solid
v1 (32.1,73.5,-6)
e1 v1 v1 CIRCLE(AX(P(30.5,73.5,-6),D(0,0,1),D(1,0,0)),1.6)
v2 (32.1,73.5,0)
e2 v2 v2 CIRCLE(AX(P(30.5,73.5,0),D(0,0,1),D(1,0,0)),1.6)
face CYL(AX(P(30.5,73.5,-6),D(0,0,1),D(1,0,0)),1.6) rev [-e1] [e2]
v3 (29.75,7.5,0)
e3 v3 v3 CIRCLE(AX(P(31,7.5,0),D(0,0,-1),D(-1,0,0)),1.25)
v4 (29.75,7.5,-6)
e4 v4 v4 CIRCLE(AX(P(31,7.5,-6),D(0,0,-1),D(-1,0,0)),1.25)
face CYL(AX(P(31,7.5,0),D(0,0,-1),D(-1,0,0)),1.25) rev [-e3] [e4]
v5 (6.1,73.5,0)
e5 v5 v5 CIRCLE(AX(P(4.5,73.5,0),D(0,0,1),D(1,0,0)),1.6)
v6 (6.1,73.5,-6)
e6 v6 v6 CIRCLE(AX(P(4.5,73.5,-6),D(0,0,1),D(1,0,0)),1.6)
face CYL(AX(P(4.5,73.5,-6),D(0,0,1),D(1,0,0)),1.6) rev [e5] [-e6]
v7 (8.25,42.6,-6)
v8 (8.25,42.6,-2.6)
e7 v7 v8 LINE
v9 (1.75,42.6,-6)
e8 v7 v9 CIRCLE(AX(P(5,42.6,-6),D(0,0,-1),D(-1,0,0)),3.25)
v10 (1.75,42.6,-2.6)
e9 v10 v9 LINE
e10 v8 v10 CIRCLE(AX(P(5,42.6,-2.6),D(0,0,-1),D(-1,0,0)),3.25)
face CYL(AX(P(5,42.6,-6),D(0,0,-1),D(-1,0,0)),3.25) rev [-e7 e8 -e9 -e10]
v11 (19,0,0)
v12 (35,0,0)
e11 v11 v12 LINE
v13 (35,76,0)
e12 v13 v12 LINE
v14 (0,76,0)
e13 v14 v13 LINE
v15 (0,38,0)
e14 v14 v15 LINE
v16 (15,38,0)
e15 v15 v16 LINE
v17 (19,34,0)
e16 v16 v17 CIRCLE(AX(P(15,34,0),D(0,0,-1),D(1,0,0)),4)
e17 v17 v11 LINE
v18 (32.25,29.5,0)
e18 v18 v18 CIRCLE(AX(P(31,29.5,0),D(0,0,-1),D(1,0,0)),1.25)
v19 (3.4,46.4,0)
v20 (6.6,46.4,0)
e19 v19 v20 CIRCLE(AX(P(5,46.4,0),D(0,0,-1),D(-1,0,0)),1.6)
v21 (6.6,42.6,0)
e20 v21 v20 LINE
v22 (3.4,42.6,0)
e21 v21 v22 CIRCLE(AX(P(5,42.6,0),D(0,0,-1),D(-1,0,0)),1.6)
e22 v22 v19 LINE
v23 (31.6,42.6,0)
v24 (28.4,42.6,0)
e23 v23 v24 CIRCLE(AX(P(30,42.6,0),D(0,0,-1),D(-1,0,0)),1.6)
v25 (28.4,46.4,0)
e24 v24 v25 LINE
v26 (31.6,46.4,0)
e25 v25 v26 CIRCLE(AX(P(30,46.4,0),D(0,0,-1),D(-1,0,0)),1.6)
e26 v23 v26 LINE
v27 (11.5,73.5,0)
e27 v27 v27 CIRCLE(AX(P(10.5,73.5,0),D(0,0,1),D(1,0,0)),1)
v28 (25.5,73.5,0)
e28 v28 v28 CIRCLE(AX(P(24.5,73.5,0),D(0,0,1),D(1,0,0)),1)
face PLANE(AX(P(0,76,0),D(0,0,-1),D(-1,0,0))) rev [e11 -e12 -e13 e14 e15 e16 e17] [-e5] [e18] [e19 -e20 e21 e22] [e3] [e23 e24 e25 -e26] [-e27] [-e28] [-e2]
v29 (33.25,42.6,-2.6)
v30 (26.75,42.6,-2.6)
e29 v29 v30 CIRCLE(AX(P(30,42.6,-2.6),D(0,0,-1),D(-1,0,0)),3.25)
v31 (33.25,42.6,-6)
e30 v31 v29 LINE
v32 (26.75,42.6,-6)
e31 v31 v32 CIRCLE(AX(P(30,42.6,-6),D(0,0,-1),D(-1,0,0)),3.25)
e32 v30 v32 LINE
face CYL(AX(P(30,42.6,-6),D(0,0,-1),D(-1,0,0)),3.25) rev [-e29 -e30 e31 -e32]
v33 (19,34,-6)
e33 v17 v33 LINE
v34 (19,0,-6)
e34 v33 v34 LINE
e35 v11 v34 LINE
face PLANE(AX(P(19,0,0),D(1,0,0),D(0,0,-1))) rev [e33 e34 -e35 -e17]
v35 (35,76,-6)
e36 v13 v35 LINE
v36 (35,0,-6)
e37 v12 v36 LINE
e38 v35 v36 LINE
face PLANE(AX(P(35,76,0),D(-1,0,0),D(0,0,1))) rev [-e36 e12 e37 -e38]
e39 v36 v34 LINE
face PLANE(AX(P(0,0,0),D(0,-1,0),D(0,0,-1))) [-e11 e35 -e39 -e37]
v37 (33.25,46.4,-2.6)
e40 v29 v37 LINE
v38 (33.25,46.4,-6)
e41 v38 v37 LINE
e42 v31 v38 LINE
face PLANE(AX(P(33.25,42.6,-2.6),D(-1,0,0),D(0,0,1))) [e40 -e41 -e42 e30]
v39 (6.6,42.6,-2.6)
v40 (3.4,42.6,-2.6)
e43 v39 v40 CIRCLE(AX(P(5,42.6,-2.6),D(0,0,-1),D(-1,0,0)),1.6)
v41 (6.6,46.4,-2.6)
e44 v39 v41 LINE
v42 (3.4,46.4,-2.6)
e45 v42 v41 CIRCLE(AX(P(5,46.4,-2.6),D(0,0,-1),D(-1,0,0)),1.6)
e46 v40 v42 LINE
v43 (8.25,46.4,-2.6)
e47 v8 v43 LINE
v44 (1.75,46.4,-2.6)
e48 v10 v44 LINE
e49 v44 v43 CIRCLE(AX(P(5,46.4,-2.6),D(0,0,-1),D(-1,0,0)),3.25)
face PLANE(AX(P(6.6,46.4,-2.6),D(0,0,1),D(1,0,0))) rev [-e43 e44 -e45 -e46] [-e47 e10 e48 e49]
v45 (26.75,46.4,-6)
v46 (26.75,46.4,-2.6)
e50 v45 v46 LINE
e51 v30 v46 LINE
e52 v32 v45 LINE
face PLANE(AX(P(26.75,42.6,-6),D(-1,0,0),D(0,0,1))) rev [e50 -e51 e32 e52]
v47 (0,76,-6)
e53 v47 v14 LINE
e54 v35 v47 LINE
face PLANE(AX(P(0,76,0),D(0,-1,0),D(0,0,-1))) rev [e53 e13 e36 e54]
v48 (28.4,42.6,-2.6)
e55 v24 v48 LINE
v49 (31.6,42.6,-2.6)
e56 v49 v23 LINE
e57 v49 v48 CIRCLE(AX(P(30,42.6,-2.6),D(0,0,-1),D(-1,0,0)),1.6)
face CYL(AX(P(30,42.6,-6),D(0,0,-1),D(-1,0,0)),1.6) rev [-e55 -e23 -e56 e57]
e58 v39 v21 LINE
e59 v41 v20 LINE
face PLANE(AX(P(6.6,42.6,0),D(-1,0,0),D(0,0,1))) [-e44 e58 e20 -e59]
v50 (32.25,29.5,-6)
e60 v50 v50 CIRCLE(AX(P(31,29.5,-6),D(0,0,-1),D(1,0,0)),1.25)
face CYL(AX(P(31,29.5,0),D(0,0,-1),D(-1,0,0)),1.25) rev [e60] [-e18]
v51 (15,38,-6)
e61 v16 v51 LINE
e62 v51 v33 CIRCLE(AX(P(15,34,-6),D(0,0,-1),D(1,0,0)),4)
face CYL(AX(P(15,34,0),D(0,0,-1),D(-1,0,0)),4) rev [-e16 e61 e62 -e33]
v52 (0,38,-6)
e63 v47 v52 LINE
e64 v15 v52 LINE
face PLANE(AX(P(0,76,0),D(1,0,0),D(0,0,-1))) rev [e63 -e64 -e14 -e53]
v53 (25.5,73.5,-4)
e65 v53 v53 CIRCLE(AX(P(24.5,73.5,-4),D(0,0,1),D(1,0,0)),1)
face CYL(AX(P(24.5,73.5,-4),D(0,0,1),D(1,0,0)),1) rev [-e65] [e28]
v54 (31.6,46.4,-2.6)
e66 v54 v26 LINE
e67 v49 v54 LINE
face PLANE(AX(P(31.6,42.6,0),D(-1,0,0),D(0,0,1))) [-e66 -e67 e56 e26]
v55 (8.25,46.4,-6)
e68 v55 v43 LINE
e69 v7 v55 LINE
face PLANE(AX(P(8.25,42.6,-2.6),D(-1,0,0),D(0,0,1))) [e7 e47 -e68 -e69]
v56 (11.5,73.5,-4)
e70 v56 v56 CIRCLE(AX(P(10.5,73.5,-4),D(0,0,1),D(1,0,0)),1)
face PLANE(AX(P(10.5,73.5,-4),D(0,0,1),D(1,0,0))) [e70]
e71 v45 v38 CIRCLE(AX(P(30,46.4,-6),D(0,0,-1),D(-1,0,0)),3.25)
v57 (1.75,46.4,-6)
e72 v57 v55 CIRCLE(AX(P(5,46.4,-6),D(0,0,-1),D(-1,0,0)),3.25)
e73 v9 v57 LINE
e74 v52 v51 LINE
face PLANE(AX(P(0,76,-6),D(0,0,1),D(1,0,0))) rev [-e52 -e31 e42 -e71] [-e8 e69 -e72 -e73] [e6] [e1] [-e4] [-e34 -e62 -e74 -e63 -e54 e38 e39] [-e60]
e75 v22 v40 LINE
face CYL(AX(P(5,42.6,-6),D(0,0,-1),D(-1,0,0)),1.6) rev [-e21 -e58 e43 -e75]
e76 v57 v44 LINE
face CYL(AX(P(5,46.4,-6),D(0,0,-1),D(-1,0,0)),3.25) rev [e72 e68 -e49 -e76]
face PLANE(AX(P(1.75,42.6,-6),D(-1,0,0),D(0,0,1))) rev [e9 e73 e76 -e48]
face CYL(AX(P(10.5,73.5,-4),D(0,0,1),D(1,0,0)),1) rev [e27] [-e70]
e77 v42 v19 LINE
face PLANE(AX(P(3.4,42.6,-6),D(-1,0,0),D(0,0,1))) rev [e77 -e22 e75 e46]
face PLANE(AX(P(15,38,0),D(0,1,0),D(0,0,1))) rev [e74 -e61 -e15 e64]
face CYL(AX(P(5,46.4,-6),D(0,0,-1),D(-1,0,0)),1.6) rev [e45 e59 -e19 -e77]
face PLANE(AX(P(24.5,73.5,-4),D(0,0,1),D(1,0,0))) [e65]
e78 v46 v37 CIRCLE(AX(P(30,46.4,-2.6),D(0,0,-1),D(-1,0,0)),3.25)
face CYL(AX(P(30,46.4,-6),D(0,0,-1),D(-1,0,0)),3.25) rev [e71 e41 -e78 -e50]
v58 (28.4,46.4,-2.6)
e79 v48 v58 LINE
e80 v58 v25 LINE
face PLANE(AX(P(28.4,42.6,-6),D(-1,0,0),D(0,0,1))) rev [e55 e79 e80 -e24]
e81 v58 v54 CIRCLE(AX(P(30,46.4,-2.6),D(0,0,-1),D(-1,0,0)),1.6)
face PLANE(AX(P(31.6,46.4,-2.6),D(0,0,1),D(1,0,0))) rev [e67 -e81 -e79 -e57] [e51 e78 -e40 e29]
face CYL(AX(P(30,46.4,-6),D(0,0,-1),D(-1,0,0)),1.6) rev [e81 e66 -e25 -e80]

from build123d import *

# Parameters (mm, degrees)
SKETCH1_W                                      = 35
SKETCH1_H                                      = 6
BOSS_EXTRUDE1_DEPTH                            = 76
SKETCH2_R                                      = 1.6
CUT_EXTRUDE1_DEPTH                             = 84.886828525
SKETCH3_R                                      = 1
CUT_EXTRUDE2_DEPTH                             = 4
CBORE_START                                    = -6
CBORE_SLOT_FOR_M3_HEX_SOCKET_HEAD_CAP_SC_DEPTH = 3.4
CBORE_START_2                                  = -2.6
CBORE_SLOT_FOR_M3_HEX_SOCKET_HEAD_CA_3_DEPTH   = 2.6
CUT_EXTRUDE3_DEPTH                             = 84.886828525
SKETCH8_R                                      = 1.25
CUT_EXTRUDE4_DEPTH                             = 84.886828525


# Read off the part's stored shape, not the designer's step: CBORE SLOT for M3 Hex Socket Head Cap Screw1
with BuildPart() as part:
    # Sketch1 → Boss-Extrude1 (new body)
    with BuildSketch(Plane(origin=(0, 0, 0), x_dir=(1, 0, 0), z_dir=(0, 1, 0))):
        with Locations((17.5, 3)):
            Rectangle(SKETCH1_W, SKETCH1_H)
    extrude(amount=BOSS_EXTRUDE1_DEPTH)

    # Sketch2 → Cut-Extrude1 (cut, through all)
    with BuildSketch(Plane.XY):
        with Locations((4.5, 73.5)):
            Circle(SKETCH2_R)
        with Locations((30.5, 73.5)):
            Circle(SKETCH2_R)
    extrude(amount=-CUT_EXTRUDE1_DEPTH, mode=Mode.SUBTRACT)

    # Sketch3 → Cut-Extrude2 (cut)
    with BuildSketch(Plane.XY):
        with Locations((10.5, 73.5)):
            Circle(SKETCH3_R)
        with Locations((24.5, 73.5)):
            Circle(SKETCH3_R)
    extrude(amount=-CUT_EXTRUDE2_DEPTH, mode=Mode.SUBTRACT)

    # CBORE SLOT for M3 Hex Socket Head Ca 2 → CBORE SLOT for M3 Hex Socket Head Cap Screw1 (cut)
    with BuildSketch(Plane.XY.offset(CBORE_START)):
        with BuildLine():
            ThreePointArc((8.25, 46.4), (5, 49.65), (1.75, 46.4))
            Line((1.75, 46.4), (1.75, 42.6))
            ThreePointArc((1.75, 42.6), (5, 39.35), (8.25, 42.6))
            Line((8.25, 42.6), (8.25, 46.4))
        make_face()
        with BuildLine():
            ThreePointArc((33.25, 46.4), (30, 49.65), (26.75, 46.4))
            Line((26.75, 46.4), (26.75, 42.6))
            ThreePointArc((26.75, 42.6), (30, 39.35), (33.25, 42.6))
            Line((33.25, 42.6), (33.25, 46.4))
        make_face()
    extrude(amount=CBORE_SLOT_FOR_M3_HEX_SOCKET_HEAD_CAP_SC_DEPTH, mode=Mode.SUBTRACT)

    # CBORE SLOT for M3 Hex Socket Head Ca 3 o → CBORE SLOT for M3 Hex Socket Head Ca 3 (cut)
    with BuildSketch(Plane.XY.offset(CBORE_START_2)):
        with BuildLine():
            ThreePointArc((6.6, 46.4), (5, 48), (3.4, 46.4))
            Line((3.4, 46.4), (3.4, 42.6))
            ThreePointArc((3.4, 42.6), (5, 41), (6.6, 42.6))
            Line((6.6, 42.6), (6.6, 46.4))
        make_face()
        with BuildLine():
            ThreePointArc((31.6, 46.4), (30, 48), (28.4, 46.4))
            Line((28.4, 46.4), (28.4, 42.6))
            ThreePointArc((28.4, 42.6), (30, 41), (31.6, 42.6))
            Line((31.6, 42.6), (31.6, 46.4))
        make_face()
    extrude(amount=CBORE_SLOT_FOR_M3_HEX_SOCKET_HEAD_CA_3_DEPTH, mode=Mode.SUBTRACT)

    # Sketch7 → Cut-Extrude3 (cut, through all)
    with BuildSketch(Plane(origin=(0, 0, -6), x_dir=(-1, 0, 0), z_dir=(0, 0, -1))):
        with BuildLine():
            Line((0, 0), (-19, 0))
            Line((-19, 0), (-19, 34))
            ThreePointArc((-19, 34), (-17.828427125, 36.828427125), (-15, 38))
            Line((-15, 38), (0, 38))
            Line((0, 38), (0, 0))
        make_face()
    extrude(amount=-CUT_EXTRUDE3_DEPTH, mode=Mode.SUBTRACT)

    # Sketch8 → Cut-Extrude4 (cut, through all)
    with BuildSketch(Plane(origin=(0, 0, -6), x_dir=(-1, 0, 0), z_dir=(0, 0, -1))):
        with Locations((-31, 7.5)):
            Circle(SKETCH8_R)
        with Locations(Location((-31, 29.5, 0), (0, 0, 180))):
            Circle(SKETCH8_R)
    extrude(amount=-CUT_EXTRUDE4_DEPTH, mode=Mode.SUBTRACT)


solid = part.part
